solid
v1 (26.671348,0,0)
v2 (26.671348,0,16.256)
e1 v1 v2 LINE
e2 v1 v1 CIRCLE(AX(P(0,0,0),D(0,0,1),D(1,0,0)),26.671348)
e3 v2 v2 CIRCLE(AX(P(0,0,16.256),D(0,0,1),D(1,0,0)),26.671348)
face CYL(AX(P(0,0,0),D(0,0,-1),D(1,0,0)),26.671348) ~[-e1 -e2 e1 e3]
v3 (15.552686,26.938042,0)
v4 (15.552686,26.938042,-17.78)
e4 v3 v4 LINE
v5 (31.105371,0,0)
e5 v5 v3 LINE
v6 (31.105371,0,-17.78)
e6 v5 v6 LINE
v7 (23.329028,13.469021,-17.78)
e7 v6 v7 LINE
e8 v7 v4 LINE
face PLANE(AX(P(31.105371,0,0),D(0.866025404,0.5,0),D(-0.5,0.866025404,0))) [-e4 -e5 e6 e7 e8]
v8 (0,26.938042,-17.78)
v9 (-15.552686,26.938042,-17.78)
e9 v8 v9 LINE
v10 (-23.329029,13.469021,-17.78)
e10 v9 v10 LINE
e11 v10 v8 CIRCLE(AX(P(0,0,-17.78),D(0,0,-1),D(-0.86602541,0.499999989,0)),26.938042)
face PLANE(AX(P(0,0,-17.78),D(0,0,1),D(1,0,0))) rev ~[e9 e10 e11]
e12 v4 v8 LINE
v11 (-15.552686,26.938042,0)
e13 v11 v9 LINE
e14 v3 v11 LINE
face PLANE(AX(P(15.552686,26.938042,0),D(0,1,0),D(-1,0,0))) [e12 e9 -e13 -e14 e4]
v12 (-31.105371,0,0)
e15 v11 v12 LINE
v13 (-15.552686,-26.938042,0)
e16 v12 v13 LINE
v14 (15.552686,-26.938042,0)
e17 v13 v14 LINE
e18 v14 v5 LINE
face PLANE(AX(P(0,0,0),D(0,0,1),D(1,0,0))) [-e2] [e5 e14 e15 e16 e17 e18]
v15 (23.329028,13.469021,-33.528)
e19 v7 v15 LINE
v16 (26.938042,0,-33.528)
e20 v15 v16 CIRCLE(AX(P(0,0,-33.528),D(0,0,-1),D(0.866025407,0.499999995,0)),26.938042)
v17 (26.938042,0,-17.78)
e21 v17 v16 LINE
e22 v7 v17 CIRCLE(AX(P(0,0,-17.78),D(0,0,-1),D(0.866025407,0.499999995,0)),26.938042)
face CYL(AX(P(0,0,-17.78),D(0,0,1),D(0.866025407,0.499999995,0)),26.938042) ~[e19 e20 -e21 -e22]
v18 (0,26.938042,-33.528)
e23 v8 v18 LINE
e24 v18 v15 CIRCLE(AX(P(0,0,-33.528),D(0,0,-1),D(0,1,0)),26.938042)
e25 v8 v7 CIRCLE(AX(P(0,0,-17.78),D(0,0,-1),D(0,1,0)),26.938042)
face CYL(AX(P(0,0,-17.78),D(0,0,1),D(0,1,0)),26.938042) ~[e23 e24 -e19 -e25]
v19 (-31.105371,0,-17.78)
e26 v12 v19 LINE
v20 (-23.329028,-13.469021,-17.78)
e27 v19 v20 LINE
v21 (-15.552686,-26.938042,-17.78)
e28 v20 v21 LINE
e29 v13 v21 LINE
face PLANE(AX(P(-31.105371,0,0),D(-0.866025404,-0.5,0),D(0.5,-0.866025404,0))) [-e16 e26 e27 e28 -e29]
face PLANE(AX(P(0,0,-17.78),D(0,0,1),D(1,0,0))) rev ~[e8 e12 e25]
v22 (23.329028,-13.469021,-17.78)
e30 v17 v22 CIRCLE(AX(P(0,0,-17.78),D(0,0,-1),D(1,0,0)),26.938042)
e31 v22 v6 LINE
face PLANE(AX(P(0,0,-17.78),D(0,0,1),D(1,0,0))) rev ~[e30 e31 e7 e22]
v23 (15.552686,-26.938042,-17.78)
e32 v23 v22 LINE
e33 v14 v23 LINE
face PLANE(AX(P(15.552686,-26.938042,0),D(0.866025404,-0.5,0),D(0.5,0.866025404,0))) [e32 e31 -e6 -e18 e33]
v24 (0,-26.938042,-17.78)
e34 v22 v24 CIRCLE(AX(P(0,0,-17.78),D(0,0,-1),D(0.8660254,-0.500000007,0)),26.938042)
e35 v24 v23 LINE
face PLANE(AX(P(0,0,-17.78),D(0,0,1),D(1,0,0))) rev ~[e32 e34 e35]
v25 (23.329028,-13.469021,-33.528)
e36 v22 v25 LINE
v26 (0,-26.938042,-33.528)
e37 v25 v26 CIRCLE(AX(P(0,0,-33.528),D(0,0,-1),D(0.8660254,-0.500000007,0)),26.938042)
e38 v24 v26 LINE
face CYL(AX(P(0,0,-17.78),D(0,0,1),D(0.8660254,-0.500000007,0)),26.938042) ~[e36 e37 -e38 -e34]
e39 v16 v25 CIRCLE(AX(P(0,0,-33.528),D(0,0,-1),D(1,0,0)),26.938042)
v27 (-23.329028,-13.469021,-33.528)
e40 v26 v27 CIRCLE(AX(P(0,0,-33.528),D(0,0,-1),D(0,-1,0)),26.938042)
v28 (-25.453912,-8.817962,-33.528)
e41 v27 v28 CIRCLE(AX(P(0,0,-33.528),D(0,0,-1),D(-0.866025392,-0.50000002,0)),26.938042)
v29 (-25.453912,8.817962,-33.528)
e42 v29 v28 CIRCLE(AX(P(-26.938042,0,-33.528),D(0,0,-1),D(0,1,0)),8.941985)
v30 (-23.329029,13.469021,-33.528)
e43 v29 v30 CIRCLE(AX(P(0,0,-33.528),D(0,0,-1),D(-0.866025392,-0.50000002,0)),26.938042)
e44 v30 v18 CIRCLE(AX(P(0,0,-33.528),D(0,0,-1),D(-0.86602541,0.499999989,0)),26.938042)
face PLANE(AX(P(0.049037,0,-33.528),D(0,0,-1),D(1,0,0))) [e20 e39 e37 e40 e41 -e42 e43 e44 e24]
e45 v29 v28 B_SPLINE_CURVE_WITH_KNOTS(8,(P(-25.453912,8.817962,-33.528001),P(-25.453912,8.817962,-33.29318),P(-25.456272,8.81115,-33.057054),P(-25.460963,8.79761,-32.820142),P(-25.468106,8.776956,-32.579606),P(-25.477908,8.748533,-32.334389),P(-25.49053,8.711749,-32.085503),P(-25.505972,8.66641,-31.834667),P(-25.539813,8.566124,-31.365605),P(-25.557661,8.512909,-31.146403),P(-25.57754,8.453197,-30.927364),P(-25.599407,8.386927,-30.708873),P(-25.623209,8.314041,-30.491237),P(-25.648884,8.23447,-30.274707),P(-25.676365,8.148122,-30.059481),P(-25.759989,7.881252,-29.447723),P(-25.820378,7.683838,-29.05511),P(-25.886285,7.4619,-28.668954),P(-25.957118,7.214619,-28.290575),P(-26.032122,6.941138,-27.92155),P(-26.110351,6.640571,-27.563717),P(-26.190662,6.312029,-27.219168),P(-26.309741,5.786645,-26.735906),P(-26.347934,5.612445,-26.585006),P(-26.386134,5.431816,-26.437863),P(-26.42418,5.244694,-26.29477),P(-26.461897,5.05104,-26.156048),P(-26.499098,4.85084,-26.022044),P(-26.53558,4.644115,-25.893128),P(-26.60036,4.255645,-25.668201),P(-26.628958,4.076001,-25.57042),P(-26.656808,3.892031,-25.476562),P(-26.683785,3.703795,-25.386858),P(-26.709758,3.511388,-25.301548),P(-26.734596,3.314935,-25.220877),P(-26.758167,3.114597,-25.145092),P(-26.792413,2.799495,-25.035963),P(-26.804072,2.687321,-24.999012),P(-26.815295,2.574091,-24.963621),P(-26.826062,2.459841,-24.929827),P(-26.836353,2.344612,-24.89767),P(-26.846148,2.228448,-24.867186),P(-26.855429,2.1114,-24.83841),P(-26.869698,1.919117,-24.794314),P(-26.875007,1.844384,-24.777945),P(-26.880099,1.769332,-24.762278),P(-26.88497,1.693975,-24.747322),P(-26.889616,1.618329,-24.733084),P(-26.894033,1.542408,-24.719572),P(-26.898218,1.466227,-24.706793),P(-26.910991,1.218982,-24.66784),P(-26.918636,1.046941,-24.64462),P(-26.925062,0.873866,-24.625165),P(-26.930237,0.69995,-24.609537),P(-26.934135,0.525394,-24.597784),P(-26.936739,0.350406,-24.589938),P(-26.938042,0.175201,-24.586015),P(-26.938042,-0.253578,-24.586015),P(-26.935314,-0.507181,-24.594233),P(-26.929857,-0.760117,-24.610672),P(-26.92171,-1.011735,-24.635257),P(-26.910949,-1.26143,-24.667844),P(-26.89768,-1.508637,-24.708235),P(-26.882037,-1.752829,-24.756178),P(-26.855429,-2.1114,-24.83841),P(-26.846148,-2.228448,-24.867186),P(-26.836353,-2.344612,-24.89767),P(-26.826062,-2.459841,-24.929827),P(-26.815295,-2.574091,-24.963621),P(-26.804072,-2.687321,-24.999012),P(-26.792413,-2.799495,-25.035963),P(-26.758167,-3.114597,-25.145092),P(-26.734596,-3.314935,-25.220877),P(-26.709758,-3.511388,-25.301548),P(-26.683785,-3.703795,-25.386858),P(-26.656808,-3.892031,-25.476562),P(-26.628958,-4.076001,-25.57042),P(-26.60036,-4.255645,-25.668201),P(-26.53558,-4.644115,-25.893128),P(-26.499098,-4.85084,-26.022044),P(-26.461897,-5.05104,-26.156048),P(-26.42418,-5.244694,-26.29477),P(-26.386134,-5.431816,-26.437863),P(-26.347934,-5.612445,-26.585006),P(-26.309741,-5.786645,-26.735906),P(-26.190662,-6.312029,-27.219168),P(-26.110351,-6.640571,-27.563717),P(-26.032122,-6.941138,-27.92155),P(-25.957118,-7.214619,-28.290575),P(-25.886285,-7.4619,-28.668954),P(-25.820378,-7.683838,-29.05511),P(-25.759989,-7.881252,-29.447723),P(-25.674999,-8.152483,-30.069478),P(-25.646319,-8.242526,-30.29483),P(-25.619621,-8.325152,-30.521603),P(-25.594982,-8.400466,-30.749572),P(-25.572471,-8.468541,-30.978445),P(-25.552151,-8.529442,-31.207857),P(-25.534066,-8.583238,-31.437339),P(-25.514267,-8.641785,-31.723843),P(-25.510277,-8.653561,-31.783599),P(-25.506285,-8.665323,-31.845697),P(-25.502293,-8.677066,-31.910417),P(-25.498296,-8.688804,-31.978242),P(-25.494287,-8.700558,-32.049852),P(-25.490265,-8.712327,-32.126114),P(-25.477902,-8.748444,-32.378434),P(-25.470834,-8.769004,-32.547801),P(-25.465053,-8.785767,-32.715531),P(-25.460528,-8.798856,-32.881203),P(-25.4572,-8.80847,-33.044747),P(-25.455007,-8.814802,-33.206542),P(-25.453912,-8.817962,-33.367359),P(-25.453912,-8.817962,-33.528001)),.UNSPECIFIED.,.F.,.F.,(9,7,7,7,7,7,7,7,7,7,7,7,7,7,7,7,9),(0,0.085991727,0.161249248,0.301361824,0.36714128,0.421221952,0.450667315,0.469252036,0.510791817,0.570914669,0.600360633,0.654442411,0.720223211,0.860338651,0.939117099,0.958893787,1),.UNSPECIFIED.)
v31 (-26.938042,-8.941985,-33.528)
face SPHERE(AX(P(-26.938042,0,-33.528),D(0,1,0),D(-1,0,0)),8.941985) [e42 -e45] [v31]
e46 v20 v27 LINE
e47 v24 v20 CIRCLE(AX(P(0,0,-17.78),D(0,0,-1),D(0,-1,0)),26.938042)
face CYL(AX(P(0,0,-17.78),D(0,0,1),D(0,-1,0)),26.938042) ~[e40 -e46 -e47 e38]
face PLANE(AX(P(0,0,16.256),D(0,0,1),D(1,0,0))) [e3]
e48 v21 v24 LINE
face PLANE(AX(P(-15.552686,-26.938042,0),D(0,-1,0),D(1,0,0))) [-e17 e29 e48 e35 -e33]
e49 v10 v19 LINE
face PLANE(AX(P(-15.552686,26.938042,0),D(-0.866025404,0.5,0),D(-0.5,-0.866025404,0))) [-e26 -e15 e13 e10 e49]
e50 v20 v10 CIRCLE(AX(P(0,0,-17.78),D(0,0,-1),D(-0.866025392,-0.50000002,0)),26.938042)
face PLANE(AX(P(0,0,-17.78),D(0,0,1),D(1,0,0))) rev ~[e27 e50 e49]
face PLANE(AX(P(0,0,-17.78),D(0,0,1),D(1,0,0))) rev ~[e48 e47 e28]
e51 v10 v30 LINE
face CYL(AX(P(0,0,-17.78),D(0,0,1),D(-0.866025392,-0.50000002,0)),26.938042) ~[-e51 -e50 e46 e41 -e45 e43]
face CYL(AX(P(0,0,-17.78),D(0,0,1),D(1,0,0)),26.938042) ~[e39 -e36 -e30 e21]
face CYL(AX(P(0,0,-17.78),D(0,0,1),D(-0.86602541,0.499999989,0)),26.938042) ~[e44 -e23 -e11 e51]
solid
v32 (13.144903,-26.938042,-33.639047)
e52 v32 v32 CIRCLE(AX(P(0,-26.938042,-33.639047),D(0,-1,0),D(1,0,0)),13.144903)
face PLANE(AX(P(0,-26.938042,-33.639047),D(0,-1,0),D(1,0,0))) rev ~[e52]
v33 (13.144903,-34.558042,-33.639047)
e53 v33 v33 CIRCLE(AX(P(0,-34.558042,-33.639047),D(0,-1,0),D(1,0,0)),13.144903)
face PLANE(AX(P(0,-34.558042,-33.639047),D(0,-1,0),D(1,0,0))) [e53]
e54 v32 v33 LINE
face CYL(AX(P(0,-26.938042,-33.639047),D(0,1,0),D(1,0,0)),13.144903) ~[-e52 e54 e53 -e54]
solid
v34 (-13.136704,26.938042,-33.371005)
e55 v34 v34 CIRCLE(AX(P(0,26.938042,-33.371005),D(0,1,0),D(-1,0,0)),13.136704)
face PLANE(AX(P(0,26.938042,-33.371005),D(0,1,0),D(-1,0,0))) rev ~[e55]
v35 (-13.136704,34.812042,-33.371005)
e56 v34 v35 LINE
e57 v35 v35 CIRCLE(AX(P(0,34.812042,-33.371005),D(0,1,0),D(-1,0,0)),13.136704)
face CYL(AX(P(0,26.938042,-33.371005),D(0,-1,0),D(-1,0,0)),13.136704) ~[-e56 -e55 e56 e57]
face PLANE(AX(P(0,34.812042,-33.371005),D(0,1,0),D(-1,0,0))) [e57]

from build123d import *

# Parameters (mm, degrees)
F0_R     = 26.671348359
F1_DEPTH = 16.256
F3_DEPTH = 17.78
F5_DEPTH = 15.748
F6_R     = 13.1367039981
F7_DEPTH = 7.874
F8_R     = 13.144903068
F9_DEPTH = 7.62


# Not quite as in the source:
# - the program builds the solid bodies; features that only make, move or delete a surface that nothing else refers to are left out


with BuildPart() as f1:
    # F0 (on Top) → F1 (new body)
    with BuildSketch(Plane.XY):
        Circle(F0_R)
    extrude(amount=F1_DEPTH)

    # F2 (on Top) → F3 (join)
    with BuildSketch(Plane.XY):
        Polygon((15.5526856108, 26.9380416721), (-15.5526856108, 26.9380416721), (-31.1053712217, 0), (-15.5526856108, -26.9380416721), (15.5526856108, -26.9380416721), (31.1053712217, 0), align=None)
    extrude(amount=-F3_DEPTH)

    # F4 (on face) → F5 (join)
    with BuildSketch(Plane(origin=(0, 0, -17.78), x_dir=(1, 0, 0), z_dir=(0, 0, -1))):
        with BuildLine():
            ThreePointArc((23.3290284987, -13.4690206932), (26.0201501821, -6.9720781429), (26.9380416721, 0))
            ThreePointArc((26.9380416721, 0), (26.0201501337, 6.9720783236), (23.3290283116, 13.4690210173))
            ThreePointArc((23.3290283116, 13.4690210173), (13.4690207454, 23.3290284686), (0, 26.9380416721))
            ThreePointArc((0, 26.9380416721), (-13.4690205688, 23.3290285706), (-23.3290281076, 13.4690213707))
            ThreePointArc((-23.3290281076, 13.4690213707), (-26.9380416721, 4.834e-07), (-23.329028591, -13.4690205333))
            ThreePointArc((-23.329028591, -13.4690205333), (-13.4690209874, -23.3290283289), (0, -26.9380416721))
            ThreePointArc((0, -26.9380416721), (13.4690209075, -23.329028375), (23.3290284987, -13.4690206932))
        make_face()
    extrude(amount=F5_DEPTH)

    # F12 (on face) → F13 (revolve)
    with BuildSketch(Plane(origin=(0, 0, -33.528), x_dir=(1, 0, 0), z_dir=(0, 0, -1))):
        with BuildLine():
            Line((-26.9380416721, 1.35e-08), (-26.9380416721, 8.9419854241))
            ThreePointArc((-26.9380416721, 8.9419854241), (-35.8800270962, 0), (-26.9380416721, -8.9419854241))
            Line((-26.9380416721, -8.9419854241), (-26.9380416721, 1.35e-08))
        make_face()
    revolve(axis=Axis((-26.9380416721, 0, -33.528), (0, 1, 0)))


with BuildPart() as f7:
    # F6 (on face) → F7 (new body)
    with BuildSketch(Plane(origin=(0, 26.9380416721, 0), x_dir=(-1, 0, 0), z_dir=(0, 1, 0))):
        with Locations((0, -33.3710052073)):
            Circle(F6_R)
    extrude(amount=F7_DEPTH)


with BuildPart() as f9:
    # F8 (on face) → F9 (new body)
    with BuildSketch(Plane.XZ.offset(26.9380416721)):
        with Locations((0, -33.6390472949)):
            Circle(F8_R)
    extrude(amount=F9_DEPTH)


solid = Compound([f1.part, f7.part, f9.part])
